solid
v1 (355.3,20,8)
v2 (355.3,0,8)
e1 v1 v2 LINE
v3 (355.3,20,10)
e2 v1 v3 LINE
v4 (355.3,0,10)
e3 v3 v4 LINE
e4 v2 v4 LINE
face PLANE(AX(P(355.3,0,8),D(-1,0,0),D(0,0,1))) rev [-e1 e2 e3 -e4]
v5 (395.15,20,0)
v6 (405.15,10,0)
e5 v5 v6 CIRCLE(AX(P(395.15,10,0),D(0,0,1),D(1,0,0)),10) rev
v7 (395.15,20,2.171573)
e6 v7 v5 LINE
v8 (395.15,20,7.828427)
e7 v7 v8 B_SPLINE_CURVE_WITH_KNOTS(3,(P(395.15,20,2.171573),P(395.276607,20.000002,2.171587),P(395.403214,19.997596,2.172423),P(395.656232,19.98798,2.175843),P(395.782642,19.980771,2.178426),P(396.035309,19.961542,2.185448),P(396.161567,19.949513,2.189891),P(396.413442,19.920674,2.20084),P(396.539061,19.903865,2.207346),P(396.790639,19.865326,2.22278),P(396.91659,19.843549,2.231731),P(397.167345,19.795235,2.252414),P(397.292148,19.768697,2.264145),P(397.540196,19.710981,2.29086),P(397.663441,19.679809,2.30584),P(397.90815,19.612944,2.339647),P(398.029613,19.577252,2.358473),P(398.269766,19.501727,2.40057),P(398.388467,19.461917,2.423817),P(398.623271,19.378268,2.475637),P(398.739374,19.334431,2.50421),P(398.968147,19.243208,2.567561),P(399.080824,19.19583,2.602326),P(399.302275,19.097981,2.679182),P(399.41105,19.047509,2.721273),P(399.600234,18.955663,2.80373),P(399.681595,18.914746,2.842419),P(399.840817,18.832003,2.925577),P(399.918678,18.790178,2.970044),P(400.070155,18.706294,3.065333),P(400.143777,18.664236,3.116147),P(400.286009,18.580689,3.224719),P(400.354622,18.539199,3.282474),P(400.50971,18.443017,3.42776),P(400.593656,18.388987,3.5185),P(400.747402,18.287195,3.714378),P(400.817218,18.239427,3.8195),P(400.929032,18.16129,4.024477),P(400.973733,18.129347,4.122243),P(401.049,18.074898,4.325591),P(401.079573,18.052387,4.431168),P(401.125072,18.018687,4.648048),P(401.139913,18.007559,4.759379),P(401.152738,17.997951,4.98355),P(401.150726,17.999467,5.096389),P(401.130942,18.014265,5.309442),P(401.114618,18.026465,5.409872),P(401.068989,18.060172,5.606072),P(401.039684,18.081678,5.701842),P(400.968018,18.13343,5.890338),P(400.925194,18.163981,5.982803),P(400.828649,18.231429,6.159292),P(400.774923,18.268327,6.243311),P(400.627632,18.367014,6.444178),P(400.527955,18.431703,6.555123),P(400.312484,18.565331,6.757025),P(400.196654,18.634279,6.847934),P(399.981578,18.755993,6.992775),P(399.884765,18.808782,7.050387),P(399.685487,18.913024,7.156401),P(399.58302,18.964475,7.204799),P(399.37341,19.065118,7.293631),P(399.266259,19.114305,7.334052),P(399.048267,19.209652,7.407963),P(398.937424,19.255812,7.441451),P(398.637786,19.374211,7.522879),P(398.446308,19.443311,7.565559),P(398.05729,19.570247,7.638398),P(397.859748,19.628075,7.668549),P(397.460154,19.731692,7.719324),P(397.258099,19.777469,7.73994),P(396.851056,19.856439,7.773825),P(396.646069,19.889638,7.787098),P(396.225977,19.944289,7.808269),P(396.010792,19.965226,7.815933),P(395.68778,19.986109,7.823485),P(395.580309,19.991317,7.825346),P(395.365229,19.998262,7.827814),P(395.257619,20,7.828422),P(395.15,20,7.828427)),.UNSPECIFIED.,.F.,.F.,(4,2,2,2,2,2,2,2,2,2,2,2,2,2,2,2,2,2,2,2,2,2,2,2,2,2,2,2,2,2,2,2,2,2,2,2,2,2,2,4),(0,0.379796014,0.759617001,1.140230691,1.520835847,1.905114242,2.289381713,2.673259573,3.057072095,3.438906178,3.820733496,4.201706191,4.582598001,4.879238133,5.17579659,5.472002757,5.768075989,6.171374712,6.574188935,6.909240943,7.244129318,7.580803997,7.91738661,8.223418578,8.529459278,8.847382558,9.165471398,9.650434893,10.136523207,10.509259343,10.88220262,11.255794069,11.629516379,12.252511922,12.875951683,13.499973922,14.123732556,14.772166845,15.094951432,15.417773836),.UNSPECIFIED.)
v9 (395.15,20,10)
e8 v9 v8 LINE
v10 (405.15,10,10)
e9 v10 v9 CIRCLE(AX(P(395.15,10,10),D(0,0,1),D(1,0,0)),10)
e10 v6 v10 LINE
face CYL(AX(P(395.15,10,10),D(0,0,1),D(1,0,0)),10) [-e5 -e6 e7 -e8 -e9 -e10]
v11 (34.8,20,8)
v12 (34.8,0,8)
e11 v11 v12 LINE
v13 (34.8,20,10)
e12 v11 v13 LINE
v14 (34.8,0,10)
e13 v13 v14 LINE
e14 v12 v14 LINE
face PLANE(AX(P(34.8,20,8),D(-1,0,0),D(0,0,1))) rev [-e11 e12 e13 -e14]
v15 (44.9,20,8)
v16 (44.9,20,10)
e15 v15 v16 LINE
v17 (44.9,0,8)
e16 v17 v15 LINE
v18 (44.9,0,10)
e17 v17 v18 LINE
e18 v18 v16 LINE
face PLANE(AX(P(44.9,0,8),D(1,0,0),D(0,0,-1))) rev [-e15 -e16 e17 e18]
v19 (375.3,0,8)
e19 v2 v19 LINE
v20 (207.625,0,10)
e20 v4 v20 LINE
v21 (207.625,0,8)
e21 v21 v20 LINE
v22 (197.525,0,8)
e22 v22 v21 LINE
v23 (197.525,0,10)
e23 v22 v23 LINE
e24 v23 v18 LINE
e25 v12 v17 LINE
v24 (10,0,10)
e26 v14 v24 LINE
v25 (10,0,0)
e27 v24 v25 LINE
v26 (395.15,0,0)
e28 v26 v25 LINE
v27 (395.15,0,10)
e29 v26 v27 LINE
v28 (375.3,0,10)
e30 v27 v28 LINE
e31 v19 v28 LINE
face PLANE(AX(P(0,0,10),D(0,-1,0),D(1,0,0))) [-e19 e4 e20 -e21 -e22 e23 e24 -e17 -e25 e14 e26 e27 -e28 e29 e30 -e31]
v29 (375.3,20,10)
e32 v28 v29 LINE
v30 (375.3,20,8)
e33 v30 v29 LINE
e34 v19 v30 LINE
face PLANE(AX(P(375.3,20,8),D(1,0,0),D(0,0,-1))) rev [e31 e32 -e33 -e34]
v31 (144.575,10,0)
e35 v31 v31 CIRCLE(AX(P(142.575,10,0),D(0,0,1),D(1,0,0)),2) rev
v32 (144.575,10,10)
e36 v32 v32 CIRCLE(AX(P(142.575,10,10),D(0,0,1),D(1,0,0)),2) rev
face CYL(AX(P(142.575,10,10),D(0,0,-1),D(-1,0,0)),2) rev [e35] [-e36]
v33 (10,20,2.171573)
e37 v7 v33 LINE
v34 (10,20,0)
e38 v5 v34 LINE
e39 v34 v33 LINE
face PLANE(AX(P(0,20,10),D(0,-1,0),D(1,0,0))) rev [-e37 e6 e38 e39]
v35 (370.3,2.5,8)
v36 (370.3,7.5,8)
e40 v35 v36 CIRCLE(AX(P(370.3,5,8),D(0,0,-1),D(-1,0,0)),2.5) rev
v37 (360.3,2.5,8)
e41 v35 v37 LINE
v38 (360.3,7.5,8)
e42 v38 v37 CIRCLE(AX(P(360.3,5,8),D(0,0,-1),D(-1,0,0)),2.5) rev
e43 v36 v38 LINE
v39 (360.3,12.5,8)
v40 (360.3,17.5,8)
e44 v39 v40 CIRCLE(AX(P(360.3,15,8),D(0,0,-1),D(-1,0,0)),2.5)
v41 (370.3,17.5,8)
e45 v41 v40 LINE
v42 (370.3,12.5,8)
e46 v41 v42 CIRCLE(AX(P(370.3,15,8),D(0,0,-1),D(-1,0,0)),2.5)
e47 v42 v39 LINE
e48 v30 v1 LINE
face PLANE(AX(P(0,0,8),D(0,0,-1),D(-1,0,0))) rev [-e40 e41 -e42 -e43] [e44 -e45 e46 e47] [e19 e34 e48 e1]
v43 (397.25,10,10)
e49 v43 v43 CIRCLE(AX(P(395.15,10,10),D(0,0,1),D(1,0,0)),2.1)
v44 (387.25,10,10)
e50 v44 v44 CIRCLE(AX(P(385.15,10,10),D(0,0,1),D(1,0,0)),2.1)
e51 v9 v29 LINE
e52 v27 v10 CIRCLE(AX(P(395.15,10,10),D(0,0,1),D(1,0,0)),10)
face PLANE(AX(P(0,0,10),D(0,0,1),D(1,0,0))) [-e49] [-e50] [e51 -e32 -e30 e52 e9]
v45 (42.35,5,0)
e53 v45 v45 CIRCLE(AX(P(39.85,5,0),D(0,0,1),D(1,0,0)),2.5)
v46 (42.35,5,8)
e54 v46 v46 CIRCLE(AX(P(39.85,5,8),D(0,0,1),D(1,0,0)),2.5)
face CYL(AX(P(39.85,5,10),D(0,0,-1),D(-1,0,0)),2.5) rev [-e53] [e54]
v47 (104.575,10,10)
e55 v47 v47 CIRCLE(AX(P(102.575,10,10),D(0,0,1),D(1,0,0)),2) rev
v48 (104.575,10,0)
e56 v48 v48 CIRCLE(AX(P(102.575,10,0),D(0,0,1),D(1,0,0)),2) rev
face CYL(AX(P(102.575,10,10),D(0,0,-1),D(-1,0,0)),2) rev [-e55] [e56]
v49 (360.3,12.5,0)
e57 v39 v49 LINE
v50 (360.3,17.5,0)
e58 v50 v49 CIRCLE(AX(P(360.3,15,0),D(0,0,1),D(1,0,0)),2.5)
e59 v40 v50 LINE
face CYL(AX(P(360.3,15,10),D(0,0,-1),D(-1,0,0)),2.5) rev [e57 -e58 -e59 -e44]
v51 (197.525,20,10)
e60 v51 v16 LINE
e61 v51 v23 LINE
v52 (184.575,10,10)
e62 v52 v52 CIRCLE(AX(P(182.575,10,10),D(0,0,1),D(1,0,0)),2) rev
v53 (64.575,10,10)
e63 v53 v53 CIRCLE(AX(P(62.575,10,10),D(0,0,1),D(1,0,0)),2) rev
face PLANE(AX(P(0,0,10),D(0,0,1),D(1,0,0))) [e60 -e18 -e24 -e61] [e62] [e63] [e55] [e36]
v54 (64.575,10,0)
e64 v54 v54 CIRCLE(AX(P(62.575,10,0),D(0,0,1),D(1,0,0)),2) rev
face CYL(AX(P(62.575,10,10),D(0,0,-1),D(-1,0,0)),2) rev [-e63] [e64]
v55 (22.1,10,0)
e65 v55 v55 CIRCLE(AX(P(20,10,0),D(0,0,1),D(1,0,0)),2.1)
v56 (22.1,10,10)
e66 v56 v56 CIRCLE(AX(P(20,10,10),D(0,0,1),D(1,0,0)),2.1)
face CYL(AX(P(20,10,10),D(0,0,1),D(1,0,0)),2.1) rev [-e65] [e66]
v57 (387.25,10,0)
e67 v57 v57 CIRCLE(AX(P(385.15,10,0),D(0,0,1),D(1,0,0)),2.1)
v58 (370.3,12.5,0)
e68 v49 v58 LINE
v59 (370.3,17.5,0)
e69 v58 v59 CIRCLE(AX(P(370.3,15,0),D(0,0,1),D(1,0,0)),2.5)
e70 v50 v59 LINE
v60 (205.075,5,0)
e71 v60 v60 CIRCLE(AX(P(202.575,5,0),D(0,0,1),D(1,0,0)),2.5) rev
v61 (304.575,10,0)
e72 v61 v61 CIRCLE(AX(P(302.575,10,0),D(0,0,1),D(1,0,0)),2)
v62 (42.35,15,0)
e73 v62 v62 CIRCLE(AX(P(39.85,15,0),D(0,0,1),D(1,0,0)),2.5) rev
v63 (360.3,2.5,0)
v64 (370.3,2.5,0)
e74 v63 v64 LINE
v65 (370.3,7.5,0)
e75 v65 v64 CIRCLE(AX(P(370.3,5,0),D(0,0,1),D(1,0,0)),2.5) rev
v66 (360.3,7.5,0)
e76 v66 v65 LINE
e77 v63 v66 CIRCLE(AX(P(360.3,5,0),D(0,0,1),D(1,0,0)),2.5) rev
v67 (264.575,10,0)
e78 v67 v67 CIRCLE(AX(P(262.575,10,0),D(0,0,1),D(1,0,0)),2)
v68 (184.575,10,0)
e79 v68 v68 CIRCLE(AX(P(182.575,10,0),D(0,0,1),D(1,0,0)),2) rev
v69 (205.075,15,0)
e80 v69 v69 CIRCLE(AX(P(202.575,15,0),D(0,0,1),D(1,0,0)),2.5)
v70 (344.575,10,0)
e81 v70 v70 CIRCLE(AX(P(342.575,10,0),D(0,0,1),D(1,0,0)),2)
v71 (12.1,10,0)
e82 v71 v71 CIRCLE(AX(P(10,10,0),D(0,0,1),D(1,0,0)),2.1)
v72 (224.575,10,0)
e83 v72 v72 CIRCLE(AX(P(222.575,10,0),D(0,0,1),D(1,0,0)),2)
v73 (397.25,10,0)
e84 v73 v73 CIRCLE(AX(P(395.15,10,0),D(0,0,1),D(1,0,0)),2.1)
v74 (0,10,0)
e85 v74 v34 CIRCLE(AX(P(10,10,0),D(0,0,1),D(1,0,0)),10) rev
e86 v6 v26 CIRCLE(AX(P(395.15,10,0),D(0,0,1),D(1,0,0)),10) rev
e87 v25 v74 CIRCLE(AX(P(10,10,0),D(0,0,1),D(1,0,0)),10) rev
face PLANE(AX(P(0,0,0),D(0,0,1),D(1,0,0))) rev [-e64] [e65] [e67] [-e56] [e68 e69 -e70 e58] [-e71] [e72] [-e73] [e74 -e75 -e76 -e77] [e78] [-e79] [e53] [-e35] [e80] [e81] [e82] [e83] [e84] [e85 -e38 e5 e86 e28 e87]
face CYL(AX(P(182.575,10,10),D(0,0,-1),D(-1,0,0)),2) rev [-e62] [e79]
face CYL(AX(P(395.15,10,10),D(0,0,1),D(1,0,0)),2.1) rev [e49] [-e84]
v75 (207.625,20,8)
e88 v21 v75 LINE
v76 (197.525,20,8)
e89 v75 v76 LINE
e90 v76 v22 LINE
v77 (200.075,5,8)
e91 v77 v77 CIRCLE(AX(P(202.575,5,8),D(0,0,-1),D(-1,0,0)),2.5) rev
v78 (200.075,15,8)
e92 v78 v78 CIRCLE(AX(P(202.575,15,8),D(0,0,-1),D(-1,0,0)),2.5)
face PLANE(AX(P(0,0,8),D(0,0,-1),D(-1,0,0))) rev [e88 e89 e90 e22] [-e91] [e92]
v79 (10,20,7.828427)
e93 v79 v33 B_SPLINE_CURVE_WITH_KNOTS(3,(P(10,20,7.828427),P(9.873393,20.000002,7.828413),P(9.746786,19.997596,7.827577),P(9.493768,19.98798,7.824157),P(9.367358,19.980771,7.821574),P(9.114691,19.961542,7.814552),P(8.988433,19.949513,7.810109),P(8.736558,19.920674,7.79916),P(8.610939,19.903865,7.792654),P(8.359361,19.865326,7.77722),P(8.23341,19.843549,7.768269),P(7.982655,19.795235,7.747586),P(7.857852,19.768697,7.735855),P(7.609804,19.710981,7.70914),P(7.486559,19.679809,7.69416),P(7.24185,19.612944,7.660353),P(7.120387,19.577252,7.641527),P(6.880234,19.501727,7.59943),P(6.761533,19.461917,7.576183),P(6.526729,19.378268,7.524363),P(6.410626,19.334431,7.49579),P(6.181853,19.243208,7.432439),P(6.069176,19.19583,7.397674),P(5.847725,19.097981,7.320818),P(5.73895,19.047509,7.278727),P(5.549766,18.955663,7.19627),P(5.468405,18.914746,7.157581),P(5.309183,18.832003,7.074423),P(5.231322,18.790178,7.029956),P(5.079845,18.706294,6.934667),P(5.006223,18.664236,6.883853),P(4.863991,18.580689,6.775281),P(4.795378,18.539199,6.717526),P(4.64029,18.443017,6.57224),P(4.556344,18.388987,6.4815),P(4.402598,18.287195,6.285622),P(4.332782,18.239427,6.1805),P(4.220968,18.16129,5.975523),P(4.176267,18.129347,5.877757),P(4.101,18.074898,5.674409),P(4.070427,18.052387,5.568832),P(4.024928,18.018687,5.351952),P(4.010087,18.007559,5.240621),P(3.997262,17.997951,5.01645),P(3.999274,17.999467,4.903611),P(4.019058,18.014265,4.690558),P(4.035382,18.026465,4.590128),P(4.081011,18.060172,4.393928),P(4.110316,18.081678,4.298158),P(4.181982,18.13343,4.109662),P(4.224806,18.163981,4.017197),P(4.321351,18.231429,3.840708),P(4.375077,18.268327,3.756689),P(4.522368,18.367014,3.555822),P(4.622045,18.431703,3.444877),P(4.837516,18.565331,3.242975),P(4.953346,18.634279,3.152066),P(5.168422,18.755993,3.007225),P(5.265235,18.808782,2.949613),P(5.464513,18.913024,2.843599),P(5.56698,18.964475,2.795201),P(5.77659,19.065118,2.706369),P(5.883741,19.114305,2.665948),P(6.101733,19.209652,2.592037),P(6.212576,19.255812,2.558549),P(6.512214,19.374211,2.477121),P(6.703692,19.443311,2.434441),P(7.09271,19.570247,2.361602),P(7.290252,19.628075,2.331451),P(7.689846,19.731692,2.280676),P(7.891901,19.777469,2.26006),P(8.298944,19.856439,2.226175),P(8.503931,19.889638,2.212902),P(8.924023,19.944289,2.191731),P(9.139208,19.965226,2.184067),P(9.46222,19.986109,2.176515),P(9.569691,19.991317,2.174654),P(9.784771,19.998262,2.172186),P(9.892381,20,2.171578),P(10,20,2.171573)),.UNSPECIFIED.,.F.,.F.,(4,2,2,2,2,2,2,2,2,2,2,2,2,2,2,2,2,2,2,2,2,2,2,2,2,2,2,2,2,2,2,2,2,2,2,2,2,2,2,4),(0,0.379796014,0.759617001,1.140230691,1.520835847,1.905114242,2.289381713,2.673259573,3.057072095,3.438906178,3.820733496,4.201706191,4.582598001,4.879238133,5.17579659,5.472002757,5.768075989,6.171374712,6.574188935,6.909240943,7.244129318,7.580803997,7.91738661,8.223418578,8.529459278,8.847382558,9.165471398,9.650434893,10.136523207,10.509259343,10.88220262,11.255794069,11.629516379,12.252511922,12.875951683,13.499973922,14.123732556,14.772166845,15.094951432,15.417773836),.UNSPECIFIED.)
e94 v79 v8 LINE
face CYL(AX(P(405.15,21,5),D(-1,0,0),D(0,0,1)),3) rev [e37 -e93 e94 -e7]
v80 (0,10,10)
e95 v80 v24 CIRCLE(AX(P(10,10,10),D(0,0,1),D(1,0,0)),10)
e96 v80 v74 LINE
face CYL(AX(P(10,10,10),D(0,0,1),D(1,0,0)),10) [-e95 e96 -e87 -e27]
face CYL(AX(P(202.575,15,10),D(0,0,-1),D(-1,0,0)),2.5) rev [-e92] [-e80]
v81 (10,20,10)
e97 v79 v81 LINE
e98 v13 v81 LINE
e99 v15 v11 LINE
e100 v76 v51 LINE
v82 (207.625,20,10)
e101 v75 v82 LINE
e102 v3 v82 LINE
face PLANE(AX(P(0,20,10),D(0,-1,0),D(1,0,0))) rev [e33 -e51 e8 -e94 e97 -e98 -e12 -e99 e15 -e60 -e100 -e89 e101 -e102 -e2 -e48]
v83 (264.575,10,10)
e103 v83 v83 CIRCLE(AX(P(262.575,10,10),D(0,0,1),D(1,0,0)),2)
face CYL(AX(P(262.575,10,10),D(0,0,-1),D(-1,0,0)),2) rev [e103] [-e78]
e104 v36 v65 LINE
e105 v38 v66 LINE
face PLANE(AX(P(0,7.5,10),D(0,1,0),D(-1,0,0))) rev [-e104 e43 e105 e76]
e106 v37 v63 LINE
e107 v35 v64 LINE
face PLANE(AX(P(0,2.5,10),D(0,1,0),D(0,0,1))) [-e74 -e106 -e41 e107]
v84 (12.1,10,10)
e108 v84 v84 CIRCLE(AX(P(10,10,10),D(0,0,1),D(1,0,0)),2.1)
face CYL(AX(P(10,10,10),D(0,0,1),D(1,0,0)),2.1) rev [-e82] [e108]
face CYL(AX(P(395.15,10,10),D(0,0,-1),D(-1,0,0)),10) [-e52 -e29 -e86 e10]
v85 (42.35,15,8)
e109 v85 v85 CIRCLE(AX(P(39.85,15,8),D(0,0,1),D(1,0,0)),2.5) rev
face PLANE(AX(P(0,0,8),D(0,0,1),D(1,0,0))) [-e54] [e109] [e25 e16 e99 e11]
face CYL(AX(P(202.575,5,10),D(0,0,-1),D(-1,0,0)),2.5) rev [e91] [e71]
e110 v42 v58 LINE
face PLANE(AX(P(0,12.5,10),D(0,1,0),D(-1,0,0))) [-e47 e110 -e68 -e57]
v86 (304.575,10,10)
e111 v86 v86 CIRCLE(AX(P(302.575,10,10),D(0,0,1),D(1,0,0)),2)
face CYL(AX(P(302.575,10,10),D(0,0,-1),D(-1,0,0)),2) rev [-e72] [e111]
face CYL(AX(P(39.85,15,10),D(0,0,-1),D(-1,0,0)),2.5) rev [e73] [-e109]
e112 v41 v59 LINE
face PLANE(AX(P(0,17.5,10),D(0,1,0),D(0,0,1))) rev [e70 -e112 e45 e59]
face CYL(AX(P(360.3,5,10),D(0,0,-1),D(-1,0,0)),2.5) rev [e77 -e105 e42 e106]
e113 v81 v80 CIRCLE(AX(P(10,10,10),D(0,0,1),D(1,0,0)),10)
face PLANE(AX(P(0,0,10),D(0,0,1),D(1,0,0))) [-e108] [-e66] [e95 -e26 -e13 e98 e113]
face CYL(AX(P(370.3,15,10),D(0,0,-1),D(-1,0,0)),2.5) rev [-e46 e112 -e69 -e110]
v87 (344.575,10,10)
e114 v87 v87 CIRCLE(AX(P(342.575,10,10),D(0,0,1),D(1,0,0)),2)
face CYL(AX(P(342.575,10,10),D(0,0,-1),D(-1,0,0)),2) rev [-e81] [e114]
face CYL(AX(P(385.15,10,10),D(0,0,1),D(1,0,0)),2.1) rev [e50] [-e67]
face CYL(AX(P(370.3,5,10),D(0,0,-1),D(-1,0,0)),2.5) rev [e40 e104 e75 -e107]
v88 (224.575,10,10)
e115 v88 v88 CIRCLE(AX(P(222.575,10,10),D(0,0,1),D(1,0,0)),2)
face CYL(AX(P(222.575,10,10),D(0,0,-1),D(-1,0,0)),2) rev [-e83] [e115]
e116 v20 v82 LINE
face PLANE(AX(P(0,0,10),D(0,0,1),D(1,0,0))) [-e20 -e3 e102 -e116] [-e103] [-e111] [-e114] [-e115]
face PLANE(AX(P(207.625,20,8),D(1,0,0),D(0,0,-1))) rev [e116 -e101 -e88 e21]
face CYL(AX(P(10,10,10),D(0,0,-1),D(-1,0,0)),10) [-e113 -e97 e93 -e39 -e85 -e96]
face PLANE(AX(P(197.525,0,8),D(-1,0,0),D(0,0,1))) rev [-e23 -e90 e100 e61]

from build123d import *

# Parameters (mm, degrees)
ESQUISSE1_R             = 2.5
ESQUISSE1_R_2           = 2
BOSS_EXTRU_1_DEPTH      = 10
CONG_1_R                = 10
TROU_TARAUD_M5X0_81_D   = 4.2
ESQUISSE5_W             = 10.1
ESQUISSE5_H             = 20
ESQUISSE5_W_2           = 20
ENL_V_MAT_EXTRU_1_DEPTH = 2
ESQUISSE6_R             = 3
ENL_V_MAT_EXTRU_3_DEPTH = 406.766586229


with BuildPart() as part:
    # Esquisse1 → Boss.-Extru.1 (new body)
    with BuildSketch(Plane.XY):
        Polygon((0, 20), (0, 0), (60, 0), (385.15, 0), (405.15, 0), (405.15, 20), (385.15, 20), (60, 20), align=None)
        with Locations((202.575, 15)):
            Circle(ESQUISSE1_R, mode=Mode.SUBTRACT)
        with Locations((202.575, 5)):
            Circle(ESQUISSE1_R, mode=Mode.SUBTRACT)
        with Locations((39.85, 5)):
            Circle(ESQUISSE1_R, mode=Mode.SUBTRACT)
        with Locations((39.85, 15)):
            Circle(ESQUISSE1_R, mode=Mode.SUBTRACT)
        with Locations((222.575, 10)):
            Circle(ESQUISSE1_R_2, mode=Mode.SUBTRACT)
        with Locations((262.575, 10)):
            Circle(ESQUISSE1_R_2, mode=Mode.SUBTRACT)
        with Locations((302.575, 10)):
            Circle(ESQUISSE1_R_2, mode=Mode.SUBTRACT)
        with Locations((342.575, 10)):
            Circle(ESQUISSE1_R_2, mode=Mode.SUBTRACT)
        with Locations((182.575, 10)):
            Circle(ESQUISSE1_R_2, mode=Mode.SUBTRACT)
        with Locations((142.575, 10)):
            Circle(ESQUISSE1_R_2, mode=Mode.SUBTRACT)
        with Locations((102.575, 10)):
            Circle(ESQUISSE1_R_2, mode=Mode.SUBTRACT)
        with Locations((62.575, 10)):
            Circle(ESQUISSE1_R_2, mode=Mode.SUBTRACT)
        with BuildLine():
            Line((360.3, 17.5), (370.3, 17.5))
            ThreePointArc((370.3, 17.5), (372.8, 15), (370.3, 12.5))
            Line((370.3, 12.5), (360.3, 12.5))
            ThreePointArc((360.3, 12.5), (357.8, 15), (360.3, 17.5))
        make_face(mode=Mode.SUBTRACT)
        with BuildLine():
            Line((360.3, 2.5), (370.3, 2.5))
            ThreePointArc((370.3, 2.5), (372.8, 5), (370.3, 7.5))
            Line((370.3, 7.5), (360.3, 7.5))
            ThreePointArc((360.3, 7.5), (357.8, 5), (360.3, 2.5))
        make_face(mode=Mode.SUBTRACT)
    extrude(amount=BOSS_EXTRU_1_DEPTH)

    # Congé1
    cong_1_edges = [part.edges().sort_by_distance(p)[0] for p in [
        (0, 0, 5),
        (0, 20, 5),
        (405.15, 0, 5),
        (405.15, 20, 5),
    ]]
    fillet(cong_1_edges, radius=CONG_1_R - 0.0001)  # a hair under: the kernel refuses the full size

    # Trou taraudé M5x0.81 (through all)
    with Locations(Plane.XY.offset(10)):
        with Locations((385.15, 10), (395.15, 10), (10, 10), (20, 10)):
            Hole(TROU_TARAUD_M5X0_81_D / 2)

    # Esquisse5 → Enlèv. mat.-Extru.1 (cut)
    with BuildSketch(Plane.XY.offset(10)):
        with Locations((202.575, 10)):
            Rectangle(ESQUISSE5_W, ESQUISSE5_H)
        with Locations((365.3, 10)):
            Rectangle(ESQUISSE5_W_2, ESQUISSE5_H)
        with Locations((39.85, 10)):
            Rectangle(ESQUISSE5_W, ESQUISSE5_H)
    extrude(amount=-ENL_V_MAT_EXTRU_1_DEPTH, mode=Mode.SUBTRACT)

    # Esquisse6 → Enlèv. mat.-Extru.3 (cut, through all)
    with BuildSketch(Plane(origin=(0, 0, 0), x_dir=(0, 0, -1), z_dir=(1, 0, 0))):
        with Locations((-5, 21)):
            Circle(ESQUISSE6_R)
    extrude(amount=ENL_V_MAT_EXTRU_3_DEPTH, mode=Mode.SUBTRACT)


solid = part.part
